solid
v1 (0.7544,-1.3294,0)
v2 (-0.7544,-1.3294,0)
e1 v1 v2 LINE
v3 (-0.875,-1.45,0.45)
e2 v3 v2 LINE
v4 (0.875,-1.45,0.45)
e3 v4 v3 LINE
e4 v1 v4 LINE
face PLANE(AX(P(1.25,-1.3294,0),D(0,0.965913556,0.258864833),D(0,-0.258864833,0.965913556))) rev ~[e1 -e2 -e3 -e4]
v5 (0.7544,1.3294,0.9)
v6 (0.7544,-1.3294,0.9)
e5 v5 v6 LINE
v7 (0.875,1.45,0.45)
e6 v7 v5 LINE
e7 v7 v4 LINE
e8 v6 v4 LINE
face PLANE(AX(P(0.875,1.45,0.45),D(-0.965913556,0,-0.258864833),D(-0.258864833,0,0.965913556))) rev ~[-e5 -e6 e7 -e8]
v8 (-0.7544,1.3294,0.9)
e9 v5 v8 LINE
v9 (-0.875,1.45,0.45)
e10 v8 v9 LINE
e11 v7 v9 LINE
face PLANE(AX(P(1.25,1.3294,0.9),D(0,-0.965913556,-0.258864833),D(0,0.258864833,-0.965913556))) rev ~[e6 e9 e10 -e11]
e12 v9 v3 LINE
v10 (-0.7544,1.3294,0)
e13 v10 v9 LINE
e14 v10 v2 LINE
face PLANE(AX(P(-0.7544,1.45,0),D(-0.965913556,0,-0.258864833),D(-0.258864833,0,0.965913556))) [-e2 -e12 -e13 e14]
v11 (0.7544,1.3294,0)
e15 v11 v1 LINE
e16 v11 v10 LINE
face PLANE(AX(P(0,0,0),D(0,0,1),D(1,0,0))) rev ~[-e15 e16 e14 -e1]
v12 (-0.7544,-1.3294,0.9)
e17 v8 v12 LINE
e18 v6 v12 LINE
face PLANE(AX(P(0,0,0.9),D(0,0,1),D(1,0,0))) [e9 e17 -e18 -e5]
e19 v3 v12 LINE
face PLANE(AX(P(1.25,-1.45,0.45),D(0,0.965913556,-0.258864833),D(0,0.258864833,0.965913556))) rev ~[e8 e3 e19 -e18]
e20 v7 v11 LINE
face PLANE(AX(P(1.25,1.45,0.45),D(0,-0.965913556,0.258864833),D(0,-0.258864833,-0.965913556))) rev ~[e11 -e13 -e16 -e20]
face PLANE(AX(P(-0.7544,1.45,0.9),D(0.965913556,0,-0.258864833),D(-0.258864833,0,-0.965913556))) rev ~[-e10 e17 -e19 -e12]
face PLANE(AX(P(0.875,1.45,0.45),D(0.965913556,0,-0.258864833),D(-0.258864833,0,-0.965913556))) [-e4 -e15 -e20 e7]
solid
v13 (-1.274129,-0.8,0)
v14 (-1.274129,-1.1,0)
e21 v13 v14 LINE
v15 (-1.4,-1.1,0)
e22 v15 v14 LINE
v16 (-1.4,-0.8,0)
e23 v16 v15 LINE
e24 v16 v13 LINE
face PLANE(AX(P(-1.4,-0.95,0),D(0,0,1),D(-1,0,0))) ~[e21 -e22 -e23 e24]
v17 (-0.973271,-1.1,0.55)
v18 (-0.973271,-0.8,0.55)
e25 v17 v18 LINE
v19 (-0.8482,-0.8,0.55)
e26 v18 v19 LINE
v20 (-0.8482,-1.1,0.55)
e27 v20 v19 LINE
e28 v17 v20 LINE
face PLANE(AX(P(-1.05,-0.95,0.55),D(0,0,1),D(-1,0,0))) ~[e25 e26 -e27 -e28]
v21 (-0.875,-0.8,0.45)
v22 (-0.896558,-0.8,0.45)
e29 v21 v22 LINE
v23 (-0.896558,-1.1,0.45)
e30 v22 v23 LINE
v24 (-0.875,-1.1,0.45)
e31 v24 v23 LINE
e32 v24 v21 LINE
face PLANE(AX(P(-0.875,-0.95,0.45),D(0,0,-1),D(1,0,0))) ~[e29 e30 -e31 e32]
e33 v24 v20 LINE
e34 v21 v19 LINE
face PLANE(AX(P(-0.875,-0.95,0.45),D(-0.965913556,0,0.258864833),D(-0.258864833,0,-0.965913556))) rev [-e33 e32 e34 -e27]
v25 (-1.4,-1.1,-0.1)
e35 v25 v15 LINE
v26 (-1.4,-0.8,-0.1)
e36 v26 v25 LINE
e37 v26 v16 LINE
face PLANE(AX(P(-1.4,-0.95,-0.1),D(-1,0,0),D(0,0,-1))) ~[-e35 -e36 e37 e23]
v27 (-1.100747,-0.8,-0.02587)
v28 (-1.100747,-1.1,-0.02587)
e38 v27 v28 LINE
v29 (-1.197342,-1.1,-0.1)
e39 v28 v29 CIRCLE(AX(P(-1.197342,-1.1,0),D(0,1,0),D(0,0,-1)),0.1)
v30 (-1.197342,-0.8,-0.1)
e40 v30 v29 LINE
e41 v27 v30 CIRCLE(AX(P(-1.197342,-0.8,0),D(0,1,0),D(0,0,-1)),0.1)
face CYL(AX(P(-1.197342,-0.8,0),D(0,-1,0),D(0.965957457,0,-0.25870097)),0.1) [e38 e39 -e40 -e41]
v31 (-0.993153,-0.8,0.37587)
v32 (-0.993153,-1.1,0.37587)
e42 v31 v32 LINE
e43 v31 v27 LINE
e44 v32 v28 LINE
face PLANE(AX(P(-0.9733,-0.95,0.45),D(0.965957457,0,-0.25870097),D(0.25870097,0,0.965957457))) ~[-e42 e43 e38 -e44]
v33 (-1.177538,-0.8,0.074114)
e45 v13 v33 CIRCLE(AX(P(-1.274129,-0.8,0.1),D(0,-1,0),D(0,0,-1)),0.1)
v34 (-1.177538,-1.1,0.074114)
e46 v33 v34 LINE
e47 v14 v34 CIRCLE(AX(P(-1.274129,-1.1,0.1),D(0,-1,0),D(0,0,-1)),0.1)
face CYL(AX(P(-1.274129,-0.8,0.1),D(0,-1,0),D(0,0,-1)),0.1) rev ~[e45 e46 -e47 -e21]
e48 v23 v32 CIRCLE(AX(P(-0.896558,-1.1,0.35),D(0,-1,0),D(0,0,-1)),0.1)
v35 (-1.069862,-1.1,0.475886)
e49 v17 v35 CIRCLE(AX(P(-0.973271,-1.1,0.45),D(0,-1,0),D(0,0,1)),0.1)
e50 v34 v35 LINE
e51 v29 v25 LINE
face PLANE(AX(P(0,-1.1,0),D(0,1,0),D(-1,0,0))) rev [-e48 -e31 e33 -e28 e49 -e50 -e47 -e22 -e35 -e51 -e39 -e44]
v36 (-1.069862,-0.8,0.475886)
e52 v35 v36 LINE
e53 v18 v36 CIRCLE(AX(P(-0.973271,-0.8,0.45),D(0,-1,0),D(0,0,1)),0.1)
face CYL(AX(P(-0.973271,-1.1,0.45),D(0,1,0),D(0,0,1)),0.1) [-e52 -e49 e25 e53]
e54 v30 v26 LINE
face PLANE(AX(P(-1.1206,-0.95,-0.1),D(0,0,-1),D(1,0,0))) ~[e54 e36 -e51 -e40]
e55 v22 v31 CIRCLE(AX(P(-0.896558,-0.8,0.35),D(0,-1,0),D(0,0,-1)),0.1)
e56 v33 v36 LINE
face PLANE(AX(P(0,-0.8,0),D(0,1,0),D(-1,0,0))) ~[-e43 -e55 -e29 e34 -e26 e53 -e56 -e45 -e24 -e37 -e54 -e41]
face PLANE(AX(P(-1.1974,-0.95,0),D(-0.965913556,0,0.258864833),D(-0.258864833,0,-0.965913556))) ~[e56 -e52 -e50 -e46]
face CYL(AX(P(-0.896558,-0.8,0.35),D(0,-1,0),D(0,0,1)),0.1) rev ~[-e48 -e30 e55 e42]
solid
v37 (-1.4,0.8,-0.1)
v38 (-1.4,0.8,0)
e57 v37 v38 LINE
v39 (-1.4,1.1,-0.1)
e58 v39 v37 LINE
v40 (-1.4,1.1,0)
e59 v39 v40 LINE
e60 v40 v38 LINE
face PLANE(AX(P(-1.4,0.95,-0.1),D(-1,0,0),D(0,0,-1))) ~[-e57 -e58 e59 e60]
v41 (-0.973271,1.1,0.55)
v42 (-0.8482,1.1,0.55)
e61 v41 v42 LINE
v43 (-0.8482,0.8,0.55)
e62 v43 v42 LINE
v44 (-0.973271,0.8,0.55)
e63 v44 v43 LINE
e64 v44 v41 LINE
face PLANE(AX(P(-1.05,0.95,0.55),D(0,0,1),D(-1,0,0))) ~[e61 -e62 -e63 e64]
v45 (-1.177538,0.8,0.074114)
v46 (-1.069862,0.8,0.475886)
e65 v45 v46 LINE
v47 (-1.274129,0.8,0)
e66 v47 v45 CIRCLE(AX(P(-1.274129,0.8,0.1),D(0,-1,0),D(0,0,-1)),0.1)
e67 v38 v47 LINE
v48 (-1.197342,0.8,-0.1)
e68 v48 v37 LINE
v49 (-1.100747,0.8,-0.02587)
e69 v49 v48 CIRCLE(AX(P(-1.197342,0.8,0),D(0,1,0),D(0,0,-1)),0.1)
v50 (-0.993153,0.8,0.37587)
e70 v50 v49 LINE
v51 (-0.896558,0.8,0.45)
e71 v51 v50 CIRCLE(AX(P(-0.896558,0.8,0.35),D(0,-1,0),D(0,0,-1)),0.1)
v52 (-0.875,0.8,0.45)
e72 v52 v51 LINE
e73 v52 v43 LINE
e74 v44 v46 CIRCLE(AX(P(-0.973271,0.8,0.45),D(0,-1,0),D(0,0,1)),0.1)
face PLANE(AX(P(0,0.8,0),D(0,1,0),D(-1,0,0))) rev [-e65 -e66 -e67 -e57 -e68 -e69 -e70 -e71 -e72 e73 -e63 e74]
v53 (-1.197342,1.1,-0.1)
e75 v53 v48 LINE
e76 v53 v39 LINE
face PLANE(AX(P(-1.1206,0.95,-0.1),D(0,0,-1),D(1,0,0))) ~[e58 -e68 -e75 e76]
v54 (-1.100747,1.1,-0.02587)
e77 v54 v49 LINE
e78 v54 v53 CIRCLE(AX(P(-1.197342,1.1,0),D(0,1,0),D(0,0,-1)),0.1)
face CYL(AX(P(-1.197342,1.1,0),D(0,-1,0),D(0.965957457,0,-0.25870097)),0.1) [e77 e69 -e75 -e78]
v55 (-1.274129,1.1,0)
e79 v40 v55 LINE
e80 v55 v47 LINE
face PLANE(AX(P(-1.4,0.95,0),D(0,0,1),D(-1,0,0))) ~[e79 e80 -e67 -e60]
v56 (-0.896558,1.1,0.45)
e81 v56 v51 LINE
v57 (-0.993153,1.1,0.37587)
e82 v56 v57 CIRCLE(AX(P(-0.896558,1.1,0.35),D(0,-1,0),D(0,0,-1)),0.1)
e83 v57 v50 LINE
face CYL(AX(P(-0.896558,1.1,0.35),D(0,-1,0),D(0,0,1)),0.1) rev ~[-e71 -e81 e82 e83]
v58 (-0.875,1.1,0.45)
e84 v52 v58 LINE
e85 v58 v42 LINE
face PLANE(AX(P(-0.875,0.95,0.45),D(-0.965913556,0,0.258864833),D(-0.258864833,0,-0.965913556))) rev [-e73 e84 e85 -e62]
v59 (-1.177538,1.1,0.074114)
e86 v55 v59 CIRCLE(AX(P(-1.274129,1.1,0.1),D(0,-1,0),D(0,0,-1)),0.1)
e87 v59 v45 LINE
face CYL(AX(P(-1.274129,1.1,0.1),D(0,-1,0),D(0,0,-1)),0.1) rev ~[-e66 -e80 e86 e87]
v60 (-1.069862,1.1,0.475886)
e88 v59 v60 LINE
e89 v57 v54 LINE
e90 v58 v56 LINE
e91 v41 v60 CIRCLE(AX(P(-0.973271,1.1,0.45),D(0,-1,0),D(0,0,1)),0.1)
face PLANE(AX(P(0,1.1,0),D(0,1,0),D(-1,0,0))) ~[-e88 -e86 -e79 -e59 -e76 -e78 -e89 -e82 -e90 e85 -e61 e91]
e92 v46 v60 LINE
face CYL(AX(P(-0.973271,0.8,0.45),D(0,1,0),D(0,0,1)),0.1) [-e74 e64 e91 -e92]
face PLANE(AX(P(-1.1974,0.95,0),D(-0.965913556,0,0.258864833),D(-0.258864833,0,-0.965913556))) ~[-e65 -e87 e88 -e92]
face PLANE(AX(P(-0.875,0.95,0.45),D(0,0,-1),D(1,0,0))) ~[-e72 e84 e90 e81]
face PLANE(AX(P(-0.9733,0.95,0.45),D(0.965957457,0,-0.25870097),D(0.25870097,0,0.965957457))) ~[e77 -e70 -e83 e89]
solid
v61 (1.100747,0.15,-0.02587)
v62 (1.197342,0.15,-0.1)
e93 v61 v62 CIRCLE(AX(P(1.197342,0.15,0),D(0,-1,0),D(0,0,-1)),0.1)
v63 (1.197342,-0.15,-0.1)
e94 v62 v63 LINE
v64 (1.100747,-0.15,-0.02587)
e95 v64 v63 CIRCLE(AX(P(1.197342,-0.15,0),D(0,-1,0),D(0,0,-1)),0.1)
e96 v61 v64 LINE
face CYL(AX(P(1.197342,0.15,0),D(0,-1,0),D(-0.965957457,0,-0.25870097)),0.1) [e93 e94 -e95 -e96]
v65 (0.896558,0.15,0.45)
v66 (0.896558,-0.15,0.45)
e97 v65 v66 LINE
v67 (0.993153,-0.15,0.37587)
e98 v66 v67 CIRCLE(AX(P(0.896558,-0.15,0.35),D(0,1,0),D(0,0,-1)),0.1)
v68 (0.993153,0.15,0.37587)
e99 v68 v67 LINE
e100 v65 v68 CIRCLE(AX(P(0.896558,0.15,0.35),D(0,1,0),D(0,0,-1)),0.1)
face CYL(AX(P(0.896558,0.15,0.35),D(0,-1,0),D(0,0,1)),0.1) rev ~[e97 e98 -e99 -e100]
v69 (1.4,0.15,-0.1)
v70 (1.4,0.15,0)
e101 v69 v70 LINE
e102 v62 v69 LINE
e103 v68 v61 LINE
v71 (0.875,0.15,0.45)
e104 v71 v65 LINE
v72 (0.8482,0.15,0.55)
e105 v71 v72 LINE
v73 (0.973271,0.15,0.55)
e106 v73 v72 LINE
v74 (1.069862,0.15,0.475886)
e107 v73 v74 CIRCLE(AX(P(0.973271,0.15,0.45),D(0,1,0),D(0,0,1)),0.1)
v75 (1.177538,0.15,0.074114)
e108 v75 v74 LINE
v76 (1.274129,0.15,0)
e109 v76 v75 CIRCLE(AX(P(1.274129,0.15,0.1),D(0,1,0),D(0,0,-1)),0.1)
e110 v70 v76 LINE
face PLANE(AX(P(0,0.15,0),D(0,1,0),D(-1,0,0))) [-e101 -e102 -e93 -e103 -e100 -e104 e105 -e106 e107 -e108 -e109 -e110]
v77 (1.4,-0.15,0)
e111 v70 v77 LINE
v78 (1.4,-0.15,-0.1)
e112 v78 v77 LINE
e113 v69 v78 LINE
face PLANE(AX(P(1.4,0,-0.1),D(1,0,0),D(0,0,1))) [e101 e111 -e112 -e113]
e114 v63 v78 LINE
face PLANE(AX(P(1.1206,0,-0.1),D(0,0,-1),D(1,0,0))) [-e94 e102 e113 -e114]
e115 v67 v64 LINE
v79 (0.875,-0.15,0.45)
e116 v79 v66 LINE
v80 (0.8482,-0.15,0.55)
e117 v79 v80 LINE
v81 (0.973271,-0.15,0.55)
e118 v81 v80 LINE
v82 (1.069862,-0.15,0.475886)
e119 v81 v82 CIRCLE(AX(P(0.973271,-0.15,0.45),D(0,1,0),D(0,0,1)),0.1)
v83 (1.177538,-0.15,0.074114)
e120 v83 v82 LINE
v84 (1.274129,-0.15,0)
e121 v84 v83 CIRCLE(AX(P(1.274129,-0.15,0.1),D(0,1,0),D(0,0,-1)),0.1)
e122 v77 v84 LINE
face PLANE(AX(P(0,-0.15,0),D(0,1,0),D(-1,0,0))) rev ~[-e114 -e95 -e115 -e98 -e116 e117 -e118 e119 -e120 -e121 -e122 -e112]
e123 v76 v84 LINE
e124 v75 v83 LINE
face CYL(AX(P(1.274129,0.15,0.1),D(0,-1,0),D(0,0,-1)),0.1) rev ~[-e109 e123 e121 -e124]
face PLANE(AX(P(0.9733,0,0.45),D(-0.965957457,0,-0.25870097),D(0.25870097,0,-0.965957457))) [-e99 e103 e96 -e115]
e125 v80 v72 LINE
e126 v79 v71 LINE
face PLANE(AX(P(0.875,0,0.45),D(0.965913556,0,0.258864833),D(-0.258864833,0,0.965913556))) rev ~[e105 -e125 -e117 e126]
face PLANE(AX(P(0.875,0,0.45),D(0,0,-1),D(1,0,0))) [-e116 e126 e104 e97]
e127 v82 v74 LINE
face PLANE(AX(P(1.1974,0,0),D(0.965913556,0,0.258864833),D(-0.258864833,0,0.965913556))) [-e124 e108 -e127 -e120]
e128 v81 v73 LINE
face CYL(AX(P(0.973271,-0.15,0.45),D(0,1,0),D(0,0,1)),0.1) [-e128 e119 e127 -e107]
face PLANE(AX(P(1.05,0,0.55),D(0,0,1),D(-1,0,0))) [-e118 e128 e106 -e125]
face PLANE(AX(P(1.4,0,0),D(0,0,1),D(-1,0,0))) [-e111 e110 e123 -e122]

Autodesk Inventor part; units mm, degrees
ref_plane "XZ Plane" through (0, 0, 0) normal (0, 1, 0) x (-1, 0, 0)
ref_plane "XY Plane" through (0, 0, 0) normal (0, 0, 1) x (1, 0, 0)
sketch "Sketch1" plane through (0, 0, 0) normal (0, 0, 1) x (1, 0, 0)
  line L0 (0.875, -1.45) -> (-0.875, -1.45)
  line L1 (-0.875, -1.45) -> (-0.875, 1.45)
  line L2 (-0.875, 1.45) -> (0.875, 1.45)
  line L3 (0.875, 1.45) -> (0.875, -1.45)
  line L4 (0.875, -1.45) -> (-0.875, 1.45) construction
  line L5 (-0.875, -1.45) -> (0.875, 1.45) construction
  point P0 (0, 0)
  dimension "d0" = 1.75
  dimension "d1" = 2.9
extrude "Extrusion1" add sketch "Sketch1" along normal blind 0.9
sketch "Sketch2" plane through (-0.875, 1.45, 0) normal (0, 1, 0) x (1, 0, 0)
  line L0 (0, 0) -> (1.75, 0) projected
  line L1 (0, 0) -> (0, -0.9) projected
  line L2 (1.75, -0.9) -> (0, -0.9) projected
  line L3 (1.75, 0) -> (1.75, -0.9) projected
  line L4 (1.75, -0.45) -> (1.6294, -0.9)
  line L5 (0, -0.9) -> (1.75, -0.9) projected
  line L6 (1.75, -0.45) -> (1.6294, 0)
  line L7 (1.75, 0) -> (0, 0) projected
  line L8 (0.1206, 0) -> (0, -0.45)
  line L9 (0.1206, -0.9) -> (0, -0.45)
  point P0 (0.875, 0)
  dimension "d4" = 15
  dimension "d5" = 15
extrude "Extrusion2" cut sketch "Sketch2" against normal through all contours L0 L6 L4 L2 L9 L8 keep common part
ref_plane "Work Plane1" through (1.25, 0, 0) normal (1, 0, 0) x (0, 1, 0)
sketch "Sketch4" plane through (1.25, 0, 0) normal (1, 0, 0) x (0, 1, 0)
  line L0 (1.45, 0.9) -> (-1.45, 0.9) projected
  line L1 (-1.45, 0) -> (1.45, 0) projected
  line L2 (-1.3294, 0) -> (-1.45, 0.45)
  line L3 (-1.45, 0.45) -> (-1.3294, 0.9)
  line L4 (1.3294, 0.9) -> (1.45, 0.45)
  line L5 (1.45, 0.45) -> (1.3294, 0)
  line L6 (1.45, 0) -> (1.45, 0.45) projected
  line L7 (-1.45, 0.45) -> (-1.45, 0) projected
  point P0 (0, 0)
  dimension "d10" = 15
  dimension "d11" = 15
  dimension "d12" = 0
extrude "Extrusion3" cut sketch "Sketch4" against normal through all contours L4 L5 L1 L2 L3 L0 keep common part
sketch "Sketch5" plane through (0, 0, 0) normal (0, 1, 0) x (-1, 0, 0)
  line L0 (-0.875, 0.45) -> (-0.7544, 0.9) projected
  line L1 (-0.7544, 0) -> (-0.875, 0.45) projected
  line L2 (-0.875, 0.45) -> (-0.9733, 0.45)
  line L3 (-0.9733, 0.45) -> (-1.1206, -0.1)
  line L4 (-1.1206, -0.1) -> (-1.4, -0.1)
  line L5 (-1.4, -0.1) -> (-1.4, 0)
  line L6 (-1.4, 0) -> (-1.1974, 0)
  line L7 (-1.1974, 0) -> (-1.05, 0.55)
  line L8 (-1.05, 0.55) -> (-0.8482, 0.55)
  line L9 (0.7544, 0) -> (-0.7544, 0) projected
  point P0 (0, 0)
  point P1 (0, 0)
  dimension "d15" = 0.1
  dimension "d17" = 0.1
  dimension "d18" = 0.1
  dimension "d19" = 0.1
  dimension "d20" = 105
  dimension "d21" = 1.4
  dimension "d22" = 0.35
extrude "Extrusion4" add sketch "Sketch5" along normal mid plane 0.3 separate body
fillet "Fillet1" radius 0.1 4 edges at (1.1974, 0, 0) (1.05, 0, 0.55) (1.1206, 0, -0.1) (0.9733, 0, 0.45)
pattern_linear "Rectangular Pattern1" count 3 spacing 0.95 along (0, 1, 0) of "Extrusion4", "Fillet1" first direction both ways yes bodies 2
mirror "Mirror1" about plane through (0, 0, 0) normal (1, 0, 0) of "Extrusion4", "Rectangular Pattern1" bodies 2
sketch "Sketch7" plane through (-1.4, 0.15, -0.1) normal (0, 1, 0) x (1, 0, 0)
  line L0 (0.5518, -0.65) -> (0.525, -0.55) projected
  line L1 (0.35, -0.65) -> (0.5518, -0.65) projected
  line L2 (0.2026, -0.1) -> (0.35, -0.65) projected
  line L3 (0, -0.1) -> (0.2026, -0.1) projected
  line L4 (0, 0) -> (0, -0.1) projected
  line L5 (0.2794, 0) -> (0, 0) projected
  line L6 (0.4267, -0.55) -> (0.2794, 0) projected
  line L7 (0.525, -0.55) -> (0.4267, -0.55) projected
  arc A0 (0.2992, -0.0741) -> (0.2026, 0) centre (0.2026, -0.1) ccw projected
  line L8 (0, 0) -> (0.2026, 0) projected
  line L9 (0, -0.1) -> (0, 0) projected
  line L10 (0.1259, -0.1) -> (0, -0.1) projected
  arc A1 (0.2225, -0.1741) -> (0.1259, -0.1) centre (0.1259, -0.2) ccw projected
  line L11 (0.3301, -0.5759) -> (0.2225, -0.1741) projected
  arc A2 (0.3301, -0.5759) -> (0.4267, -0.65) centre (0.4267, -0.55) ccw projected
  line L12 (0.5518, -0.65) -> (0.4267, -0.65) projected
  line L13 (0.525, -0.55) -> (0.5518, -0.65) projected
  line L14 (0.5035, -0.55) -> (0.525, -0.55) projected
  arc A3 (0.4069, -0.4759) -> (0.5035, -0.55) centre (0.5035, -0.45) ccw projected
  line L15 (0.2992, -0.0741) -> (0.4069, -0.4759) projected
  point P0 (1.4, -0.1)
extrude "Extrusion6" cut sketch "Sketch7" against normal up to surface (0.3 mm away) bodies 2
sketch "Sketch8" plane through (1.1974, -1.1, -0.1) normal (0, -1, 0) x (1, 0, 0)
  arc A0 (-0.0966, 0.0741) -> (0, 0) centre (0, 0.1) ccw projected
  line L0 (0, 0) -> (0.2026, 0) projected
  line L1 (0.2026, 0) -> (0.2026, 0.1) projected
  line L2 (0.2026, 0.1) -> (0.0767, 0.1) projected
  arc A1 (-0.0199, 0.1741) -> (0.0767, 0.1) centre (0.0767, 0.2) ccw projected
  line L3 (-0.0199, 0.1741) -> (-0.1275, 0.5759) projected
  arc A2 (-0.1275, 0.5759) -> (-0.2241, 0.65) centre (-0.2241, 0.55) ccw projected
  line L4 (-0.2241, 0.65) -> (-0.3492, 0.65) projected
  line L5 (-0.3492, 0.65) -> (-0.3224, 0.55) projected
  line L6 (-0.3224, 0.55) -> (-0.3008, 0.55) projected
  arc A3 (-0.2042, 0.4759) -> (-0.3008, 0.55) centre (-0.3008, 0.45) ccw projected
  line L7 (-0.2042, 0.4759) -> (-0.0966, 0.0741) projected
  point P0 (-1.1974, 0.1)
extrude "Extrusion7" cut sketch "Sketch8" against normal up to surface (0.3 mm away) bodies 2
sketch "Sketch9" plane through (1.1974, 1.1, -0.1) normal (0, 1, 0) x (1, 0, 0)
  arc A0 (0, 0) -> (-0.0966, -0.0741) centre (0, -0.1) ccw projected
  line L0 (-0.0966, -0.0741) -> (-0.2042, -0.4759) projected
  arc A1 (-0.3008, -0.55) -> (-0.2042, -0.4759) centre (-0.3008, -0.45) ccw projected
  line L1 (-0.3008, -0.55) -> (-0.3224, -0.55) projected
  line L2 (-0.3224, -0.55) -> (-0.3492, -0.65) projected
  line L3 (-0.3492, -0.65) -> (-0.2241, -0.65) projected
  arc A2 (-0.2241, -0.65) -> (-0.1275, -0.5759) centre (-0.2241, -0.55) ccw projected
  line L4 (-0.1275, -0.5759) -> (-0.0199, -0.1741) projected
  arc A3 (0.0767, -0.1) -> (-0.0199, -0.1741) centre (0.0767, -0.2) ccw projected
  line L5 (0.0767, -0.1) -> (0.2026, -0.1) projected
  line L6 (0.2026, -0.1) -> (0.2026, 0) projected
  line L7 (0.2026, 0) -> (0, 0) projected
  point P0 (-1.1974, -0.1)
extrude "Extrusion8" cut sketch "Sketch9" against normal up to surface (0.3 mm away) bodies 2
properties part number "SOT23-3" material "ABS Plastic"
